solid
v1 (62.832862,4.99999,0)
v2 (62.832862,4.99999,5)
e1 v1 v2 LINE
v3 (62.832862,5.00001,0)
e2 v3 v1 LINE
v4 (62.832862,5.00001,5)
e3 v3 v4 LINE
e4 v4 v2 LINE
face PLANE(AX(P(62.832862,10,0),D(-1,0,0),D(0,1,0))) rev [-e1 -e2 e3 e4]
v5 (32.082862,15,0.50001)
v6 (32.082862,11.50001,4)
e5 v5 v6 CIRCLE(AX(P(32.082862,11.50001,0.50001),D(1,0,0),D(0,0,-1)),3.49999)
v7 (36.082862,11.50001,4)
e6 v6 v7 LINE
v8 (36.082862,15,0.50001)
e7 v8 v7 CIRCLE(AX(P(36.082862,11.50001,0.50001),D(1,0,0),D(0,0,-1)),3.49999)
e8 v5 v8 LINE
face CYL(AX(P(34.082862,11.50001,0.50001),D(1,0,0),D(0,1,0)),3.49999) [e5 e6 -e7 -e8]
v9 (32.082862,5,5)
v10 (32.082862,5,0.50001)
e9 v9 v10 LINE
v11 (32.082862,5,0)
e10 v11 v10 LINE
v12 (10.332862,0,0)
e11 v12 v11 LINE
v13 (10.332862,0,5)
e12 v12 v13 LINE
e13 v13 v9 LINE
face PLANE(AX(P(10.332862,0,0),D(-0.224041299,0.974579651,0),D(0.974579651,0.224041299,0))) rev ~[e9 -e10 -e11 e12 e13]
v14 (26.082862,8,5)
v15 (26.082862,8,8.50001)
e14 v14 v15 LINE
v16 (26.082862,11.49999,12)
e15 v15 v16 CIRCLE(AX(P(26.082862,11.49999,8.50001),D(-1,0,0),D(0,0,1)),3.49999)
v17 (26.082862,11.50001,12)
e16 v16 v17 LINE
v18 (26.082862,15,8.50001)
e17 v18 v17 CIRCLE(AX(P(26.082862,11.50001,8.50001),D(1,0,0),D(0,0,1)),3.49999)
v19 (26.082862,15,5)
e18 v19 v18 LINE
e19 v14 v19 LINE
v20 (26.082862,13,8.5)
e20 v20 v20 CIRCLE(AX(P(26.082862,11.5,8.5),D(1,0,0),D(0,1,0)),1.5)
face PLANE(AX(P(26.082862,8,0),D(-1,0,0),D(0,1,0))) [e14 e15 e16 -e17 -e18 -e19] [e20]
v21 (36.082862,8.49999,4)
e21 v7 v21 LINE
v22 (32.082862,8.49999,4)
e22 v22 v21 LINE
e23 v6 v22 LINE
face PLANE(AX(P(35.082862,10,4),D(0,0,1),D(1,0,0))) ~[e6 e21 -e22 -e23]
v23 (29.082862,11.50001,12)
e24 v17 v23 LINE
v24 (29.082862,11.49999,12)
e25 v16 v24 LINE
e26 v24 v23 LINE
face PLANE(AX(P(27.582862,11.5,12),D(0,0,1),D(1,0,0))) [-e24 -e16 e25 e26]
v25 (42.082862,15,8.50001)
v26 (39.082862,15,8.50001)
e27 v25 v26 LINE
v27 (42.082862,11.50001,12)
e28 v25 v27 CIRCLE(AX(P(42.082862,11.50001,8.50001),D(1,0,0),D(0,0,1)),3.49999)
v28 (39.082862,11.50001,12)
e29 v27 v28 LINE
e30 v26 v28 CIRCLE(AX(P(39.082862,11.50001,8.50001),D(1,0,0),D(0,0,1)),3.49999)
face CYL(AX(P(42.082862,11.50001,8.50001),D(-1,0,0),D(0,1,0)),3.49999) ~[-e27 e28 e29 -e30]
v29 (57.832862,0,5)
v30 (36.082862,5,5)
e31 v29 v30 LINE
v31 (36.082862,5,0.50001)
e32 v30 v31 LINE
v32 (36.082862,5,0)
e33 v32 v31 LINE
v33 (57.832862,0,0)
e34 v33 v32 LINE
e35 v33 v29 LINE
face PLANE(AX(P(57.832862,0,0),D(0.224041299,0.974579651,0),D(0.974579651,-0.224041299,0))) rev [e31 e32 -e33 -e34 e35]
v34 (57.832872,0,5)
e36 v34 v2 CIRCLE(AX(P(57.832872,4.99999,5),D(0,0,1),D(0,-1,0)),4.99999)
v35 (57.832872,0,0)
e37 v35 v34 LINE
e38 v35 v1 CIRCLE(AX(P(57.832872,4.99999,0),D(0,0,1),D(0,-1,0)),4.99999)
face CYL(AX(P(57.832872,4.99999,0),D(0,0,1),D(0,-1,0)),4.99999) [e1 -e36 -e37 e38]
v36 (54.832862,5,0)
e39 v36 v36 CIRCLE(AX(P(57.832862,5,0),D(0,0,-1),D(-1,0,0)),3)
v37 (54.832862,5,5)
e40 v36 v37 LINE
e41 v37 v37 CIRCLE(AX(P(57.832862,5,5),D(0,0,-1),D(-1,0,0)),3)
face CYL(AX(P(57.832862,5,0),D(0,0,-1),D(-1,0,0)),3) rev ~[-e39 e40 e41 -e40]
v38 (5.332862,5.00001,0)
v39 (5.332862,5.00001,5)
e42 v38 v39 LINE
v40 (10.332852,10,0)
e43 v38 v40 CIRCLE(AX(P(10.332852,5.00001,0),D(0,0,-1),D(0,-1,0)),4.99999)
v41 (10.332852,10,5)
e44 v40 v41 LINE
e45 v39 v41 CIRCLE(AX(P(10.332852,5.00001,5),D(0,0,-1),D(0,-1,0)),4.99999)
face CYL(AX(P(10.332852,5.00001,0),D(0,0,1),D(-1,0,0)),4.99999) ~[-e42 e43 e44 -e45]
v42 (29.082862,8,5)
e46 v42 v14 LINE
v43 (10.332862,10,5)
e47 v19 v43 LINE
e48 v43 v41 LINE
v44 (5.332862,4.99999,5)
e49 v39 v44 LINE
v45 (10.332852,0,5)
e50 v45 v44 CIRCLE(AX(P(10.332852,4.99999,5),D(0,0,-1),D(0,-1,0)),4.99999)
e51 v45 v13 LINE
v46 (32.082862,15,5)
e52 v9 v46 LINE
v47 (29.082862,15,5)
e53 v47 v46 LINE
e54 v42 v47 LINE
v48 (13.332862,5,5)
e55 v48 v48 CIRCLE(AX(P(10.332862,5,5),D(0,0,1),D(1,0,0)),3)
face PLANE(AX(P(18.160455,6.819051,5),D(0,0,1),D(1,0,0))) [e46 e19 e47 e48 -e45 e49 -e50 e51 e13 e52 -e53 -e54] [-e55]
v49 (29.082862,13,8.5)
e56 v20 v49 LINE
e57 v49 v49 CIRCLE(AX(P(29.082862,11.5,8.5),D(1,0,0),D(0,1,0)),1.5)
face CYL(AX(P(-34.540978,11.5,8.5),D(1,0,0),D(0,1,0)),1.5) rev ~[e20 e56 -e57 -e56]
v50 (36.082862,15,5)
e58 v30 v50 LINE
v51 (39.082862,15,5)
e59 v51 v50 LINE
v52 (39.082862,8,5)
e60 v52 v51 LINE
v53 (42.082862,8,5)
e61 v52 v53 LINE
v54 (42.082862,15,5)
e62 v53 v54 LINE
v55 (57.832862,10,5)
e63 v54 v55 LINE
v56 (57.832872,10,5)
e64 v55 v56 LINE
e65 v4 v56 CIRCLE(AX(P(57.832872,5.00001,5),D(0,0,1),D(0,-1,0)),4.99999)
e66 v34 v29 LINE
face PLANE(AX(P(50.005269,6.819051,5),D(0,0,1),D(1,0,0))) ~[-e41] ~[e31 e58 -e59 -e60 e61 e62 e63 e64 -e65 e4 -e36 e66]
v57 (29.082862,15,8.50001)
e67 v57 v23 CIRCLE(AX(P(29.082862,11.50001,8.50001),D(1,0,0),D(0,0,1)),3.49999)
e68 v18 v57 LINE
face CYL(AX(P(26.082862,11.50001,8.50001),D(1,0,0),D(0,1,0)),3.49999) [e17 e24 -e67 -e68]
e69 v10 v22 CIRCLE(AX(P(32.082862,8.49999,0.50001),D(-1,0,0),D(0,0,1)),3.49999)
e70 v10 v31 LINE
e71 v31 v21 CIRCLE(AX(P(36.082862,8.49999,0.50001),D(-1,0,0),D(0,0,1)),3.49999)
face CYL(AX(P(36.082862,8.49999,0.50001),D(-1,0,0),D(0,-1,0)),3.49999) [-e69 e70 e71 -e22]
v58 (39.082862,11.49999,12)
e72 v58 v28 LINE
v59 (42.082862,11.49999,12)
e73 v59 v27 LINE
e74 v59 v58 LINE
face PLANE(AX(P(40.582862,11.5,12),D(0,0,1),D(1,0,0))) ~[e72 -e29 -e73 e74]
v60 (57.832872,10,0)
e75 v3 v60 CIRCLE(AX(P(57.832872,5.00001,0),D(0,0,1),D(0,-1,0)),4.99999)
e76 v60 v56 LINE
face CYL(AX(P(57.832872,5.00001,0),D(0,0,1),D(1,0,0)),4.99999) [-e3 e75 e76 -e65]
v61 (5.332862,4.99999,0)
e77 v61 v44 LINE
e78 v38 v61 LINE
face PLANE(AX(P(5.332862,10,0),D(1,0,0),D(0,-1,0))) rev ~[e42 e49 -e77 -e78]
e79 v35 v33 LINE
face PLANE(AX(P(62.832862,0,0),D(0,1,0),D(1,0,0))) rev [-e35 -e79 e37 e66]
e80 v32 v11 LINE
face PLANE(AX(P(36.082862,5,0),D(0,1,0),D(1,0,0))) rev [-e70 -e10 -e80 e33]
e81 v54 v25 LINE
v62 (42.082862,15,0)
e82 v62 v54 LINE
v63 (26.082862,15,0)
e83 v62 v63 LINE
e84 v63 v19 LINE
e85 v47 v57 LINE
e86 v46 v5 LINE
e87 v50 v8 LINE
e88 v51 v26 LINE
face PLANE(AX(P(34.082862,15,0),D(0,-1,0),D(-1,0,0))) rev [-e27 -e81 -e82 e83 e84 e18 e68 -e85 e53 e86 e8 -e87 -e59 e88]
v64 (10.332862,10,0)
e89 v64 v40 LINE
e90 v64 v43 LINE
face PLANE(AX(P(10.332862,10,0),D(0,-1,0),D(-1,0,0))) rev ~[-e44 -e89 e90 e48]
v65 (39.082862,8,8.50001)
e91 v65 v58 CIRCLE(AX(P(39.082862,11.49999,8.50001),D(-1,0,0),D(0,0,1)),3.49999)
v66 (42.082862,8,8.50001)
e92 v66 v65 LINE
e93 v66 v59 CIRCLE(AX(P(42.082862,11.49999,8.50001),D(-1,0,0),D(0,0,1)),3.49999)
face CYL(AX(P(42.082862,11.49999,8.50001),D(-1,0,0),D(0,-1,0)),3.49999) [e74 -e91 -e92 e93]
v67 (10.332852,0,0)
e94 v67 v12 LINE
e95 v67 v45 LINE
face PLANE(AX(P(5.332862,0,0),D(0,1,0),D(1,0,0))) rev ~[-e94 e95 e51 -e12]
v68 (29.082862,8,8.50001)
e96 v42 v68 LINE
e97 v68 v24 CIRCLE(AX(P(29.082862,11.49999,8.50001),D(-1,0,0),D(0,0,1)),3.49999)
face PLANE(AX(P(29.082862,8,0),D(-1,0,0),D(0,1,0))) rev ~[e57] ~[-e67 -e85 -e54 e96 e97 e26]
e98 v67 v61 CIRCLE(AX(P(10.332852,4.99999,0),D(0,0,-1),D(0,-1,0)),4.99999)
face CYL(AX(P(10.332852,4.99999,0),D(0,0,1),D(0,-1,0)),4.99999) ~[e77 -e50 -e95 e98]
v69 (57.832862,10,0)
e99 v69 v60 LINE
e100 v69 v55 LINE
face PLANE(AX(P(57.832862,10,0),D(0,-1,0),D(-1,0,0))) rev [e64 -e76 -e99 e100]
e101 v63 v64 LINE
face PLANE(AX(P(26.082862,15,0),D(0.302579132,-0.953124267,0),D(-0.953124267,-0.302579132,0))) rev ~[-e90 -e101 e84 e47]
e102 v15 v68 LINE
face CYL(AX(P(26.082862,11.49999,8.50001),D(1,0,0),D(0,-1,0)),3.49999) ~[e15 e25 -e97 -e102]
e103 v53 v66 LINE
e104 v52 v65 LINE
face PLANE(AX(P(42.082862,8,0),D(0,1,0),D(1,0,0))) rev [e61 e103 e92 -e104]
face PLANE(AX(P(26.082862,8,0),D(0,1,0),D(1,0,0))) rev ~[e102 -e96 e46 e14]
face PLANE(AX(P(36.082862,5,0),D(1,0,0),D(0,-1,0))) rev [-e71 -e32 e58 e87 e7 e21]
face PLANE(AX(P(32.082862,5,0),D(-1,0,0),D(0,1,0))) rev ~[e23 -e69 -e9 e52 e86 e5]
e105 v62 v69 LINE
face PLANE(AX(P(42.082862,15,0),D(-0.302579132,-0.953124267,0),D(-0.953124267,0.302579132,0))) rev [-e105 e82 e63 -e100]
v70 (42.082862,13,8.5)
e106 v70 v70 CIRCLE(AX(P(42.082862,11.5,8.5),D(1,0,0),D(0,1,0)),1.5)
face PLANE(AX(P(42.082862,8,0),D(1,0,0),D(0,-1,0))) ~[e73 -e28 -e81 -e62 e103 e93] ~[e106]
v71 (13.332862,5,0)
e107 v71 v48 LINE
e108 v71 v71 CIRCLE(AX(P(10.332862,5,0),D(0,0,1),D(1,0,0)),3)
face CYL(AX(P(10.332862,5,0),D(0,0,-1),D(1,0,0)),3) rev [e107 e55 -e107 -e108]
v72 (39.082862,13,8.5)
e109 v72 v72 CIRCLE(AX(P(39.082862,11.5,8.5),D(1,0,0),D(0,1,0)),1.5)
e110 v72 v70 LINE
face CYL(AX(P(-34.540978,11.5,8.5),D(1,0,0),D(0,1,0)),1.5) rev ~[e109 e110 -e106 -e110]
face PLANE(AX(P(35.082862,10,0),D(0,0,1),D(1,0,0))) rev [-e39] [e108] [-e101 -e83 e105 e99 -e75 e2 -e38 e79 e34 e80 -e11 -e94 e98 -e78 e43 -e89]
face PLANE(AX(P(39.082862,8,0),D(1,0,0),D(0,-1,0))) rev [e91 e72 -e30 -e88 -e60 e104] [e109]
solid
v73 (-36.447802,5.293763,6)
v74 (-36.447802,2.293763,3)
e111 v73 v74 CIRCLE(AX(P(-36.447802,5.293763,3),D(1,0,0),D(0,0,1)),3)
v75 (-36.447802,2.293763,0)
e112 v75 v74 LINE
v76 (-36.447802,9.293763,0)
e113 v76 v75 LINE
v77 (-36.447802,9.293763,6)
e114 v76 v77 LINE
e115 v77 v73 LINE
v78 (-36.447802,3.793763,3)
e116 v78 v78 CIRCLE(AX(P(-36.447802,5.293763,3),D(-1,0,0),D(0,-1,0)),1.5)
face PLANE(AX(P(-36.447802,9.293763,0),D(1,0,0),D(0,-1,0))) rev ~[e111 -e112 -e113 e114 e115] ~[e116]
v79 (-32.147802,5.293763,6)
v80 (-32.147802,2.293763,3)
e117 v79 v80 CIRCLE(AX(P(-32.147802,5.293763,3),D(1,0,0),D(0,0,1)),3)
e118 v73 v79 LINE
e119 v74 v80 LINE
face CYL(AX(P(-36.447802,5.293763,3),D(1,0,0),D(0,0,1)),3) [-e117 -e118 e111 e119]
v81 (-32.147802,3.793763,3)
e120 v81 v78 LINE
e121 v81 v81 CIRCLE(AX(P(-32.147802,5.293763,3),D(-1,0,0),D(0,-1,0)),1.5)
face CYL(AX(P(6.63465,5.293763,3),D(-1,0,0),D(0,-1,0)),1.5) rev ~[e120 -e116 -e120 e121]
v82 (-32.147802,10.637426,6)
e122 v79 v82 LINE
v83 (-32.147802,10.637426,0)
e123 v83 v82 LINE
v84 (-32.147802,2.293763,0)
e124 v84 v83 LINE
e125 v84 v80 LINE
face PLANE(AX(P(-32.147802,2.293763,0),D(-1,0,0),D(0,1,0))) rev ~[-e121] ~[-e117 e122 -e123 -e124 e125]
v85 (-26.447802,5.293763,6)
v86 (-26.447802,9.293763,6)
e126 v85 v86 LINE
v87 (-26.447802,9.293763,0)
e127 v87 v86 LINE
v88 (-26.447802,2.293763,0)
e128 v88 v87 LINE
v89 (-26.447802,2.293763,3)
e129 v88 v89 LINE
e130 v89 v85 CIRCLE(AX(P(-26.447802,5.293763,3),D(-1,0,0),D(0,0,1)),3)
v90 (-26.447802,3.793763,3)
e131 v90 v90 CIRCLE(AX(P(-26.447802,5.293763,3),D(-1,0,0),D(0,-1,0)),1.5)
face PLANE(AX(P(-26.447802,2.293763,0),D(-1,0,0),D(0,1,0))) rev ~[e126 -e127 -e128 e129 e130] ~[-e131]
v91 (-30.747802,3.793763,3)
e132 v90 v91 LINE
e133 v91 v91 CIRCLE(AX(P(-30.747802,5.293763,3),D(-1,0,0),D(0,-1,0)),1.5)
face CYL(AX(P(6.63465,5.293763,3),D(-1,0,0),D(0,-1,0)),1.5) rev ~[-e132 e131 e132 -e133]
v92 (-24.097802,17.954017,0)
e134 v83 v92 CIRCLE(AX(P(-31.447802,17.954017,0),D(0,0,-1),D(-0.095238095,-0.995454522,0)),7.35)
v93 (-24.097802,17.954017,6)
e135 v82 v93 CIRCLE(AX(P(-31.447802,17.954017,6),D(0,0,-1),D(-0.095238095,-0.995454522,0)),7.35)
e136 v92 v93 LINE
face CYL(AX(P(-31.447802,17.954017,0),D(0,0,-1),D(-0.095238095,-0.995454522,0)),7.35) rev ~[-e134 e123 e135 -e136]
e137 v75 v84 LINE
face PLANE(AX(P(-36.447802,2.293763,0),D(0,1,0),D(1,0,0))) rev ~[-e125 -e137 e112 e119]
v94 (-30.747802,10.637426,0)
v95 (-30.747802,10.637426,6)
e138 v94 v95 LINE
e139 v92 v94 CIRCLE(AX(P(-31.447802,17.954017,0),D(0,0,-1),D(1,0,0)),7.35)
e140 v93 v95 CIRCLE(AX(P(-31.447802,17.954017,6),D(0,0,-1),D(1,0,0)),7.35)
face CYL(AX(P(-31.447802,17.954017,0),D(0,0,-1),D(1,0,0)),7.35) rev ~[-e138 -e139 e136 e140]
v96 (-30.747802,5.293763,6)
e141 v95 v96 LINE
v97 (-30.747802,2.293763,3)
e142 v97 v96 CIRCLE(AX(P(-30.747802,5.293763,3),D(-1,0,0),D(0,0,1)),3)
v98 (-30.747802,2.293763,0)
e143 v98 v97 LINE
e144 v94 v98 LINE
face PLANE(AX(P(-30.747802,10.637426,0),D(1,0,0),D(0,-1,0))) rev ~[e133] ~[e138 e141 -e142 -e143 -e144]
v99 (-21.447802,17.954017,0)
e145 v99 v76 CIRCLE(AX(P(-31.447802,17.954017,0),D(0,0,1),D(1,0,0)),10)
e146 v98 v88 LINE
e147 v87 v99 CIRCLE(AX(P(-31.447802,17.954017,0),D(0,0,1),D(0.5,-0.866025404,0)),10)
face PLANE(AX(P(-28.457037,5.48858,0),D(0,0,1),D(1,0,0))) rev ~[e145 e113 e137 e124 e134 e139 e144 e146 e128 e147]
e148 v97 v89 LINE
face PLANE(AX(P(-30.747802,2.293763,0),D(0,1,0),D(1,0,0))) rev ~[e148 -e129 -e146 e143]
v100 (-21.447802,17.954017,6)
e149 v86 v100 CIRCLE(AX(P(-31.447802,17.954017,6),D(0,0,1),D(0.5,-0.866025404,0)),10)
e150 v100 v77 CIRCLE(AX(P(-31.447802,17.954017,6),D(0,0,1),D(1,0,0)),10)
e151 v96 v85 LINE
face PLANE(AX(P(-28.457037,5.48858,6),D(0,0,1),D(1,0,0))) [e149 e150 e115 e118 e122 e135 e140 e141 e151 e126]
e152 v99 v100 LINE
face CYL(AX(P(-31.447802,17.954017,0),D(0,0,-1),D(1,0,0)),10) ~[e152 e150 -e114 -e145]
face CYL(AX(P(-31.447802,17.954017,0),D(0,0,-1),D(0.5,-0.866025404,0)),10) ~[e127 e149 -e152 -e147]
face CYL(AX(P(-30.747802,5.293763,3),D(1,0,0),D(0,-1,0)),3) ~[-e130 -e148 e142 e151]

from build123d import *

# Parameters (mm, degrees)
F1_DEPTH = 6
F3_D     = 3
F4_W     = 3
F4_H     = 7
F5_DEPTH = 12
F4_R     = 3
F6_DEPTH = 5
F7_DEPTH = 4
F8_R     = 4.99999
F9_R     = 3.49999
F12_D    = 3
F13_R    = 3


# Not quite as in the source:
# - a fillet or chamfer is up to 0.001 mm smaller than in the source, because OpenCascade refuses the exact size
# - a feature names something its author has since deleted; it is built from what else it names


with BuildPart() as f1:
    # F0 (on Top) → F1 (new body)
    with BuildSketch(Plane.XY):
        with BuildLine():
            ThreePointArc((-26.4478022211, 9.2937625569), (-28.5229179157, 8.3913259797), (-30.7478022211, 7.978546681))
            Line((-30.7478022211, 7.978546681), (-30.7478022211, 2.2937625569))
            Line((-30.7478022211, 2.2937625569), (-26.4478022211, 2.2937625569))
            Line((-26.4478022211, 2.2937625569), (-26.4478022211, 9.2937625569))
        make_face()
        with BuildLine():
            Line((-32.1478022211, 2.2937625569), (-32.1478022211, 7.978546681))
            ThreePointArc((-32.1478022211, 7.978546681), (-34.3726865265, 8.3913259797), (-36.4478022211, 9.2937625569))
            Line((-36.4478022211, 9.2937625569), (-36.4478022211, 2.2937625569))
            Line((-36.4478022211, 2.2937625569), (-32.1478022211, 2.2937625569))
        make_face()
        with BuildLine():
            ThreePointArc((-32.1478022211, 10.6374258586), (-36.3913586332, 23.3931111885), (-24.0978022211, 17.9540165948))
            ThreePointArc((-24.0978022211, 17.9540165948), (-26.0087076273, 13.0104601826), (-30.7478022211, 10.6374258586))
            Line((-30.7478022211, 10.6374258586), (-30.7478022211, 7.978546681))
            ThreePointArc((-30.7478022211, 7.978546681), (-28.5229179157, 8.3913259797), (-26.4478022211, 9.2937625569))
            ThreePointArc((-26.4478022211, 9.2937625569), (-22.7875481833, 12.9540165948), (-21.4478022211, 17.9540165948))
            ThreePointArc((-21.4478022211, 17.9540165948), (-36.4478022211, 26.6142706326), (-36.4478022211, 9.2937625569))
            ThreePointArc((-36.4478022211, 9.2937625569), (-34.3726865265, 8.3913259797), (-32.1478022211, 7.978546681))
            Line((-32.1478022211, 7.978546681), (-32.1478022211, 10.6374258586))
        make_face()
    extrude(amount=F1_DEPTH)

    # F3 (through all)
    with Locations(Plane.YZ.offset(-26.4478022211)):
        with Locations((5.2937625569, 3)):
            Hole(F3_D / 2)

    # F13
    f13_edges = [f1.edges().sort_by_distance(p)[0] for p in [
        (-34.297802, 2.293763, 6),
        (-28.597802, 2.293763, 6),
    ]]
    fillet(f13_edges, radius=F13_R)


with BuildPart() as f5:
    # F4 (on Top) → F5 (new body)
    with BuildSketch(Plane.XY):
        with Locations((27.5828619152, 11.5)):
            Rectangle(F4_W, F4_H)
    extrude(amount=F5_DEPTH)

    # F4 (on Top) → F6 (join)
    with BuildSketch(Plane.XY):
        Polygon((10.3328619152, 10), (5.3328619152, 10), (5.3328619152, 0), (10.3328619152, 0), (32.0828619152, 5), (32.0828619152, 8), (29.0828619152, 8), (26.0828619152, 8), (26.0828619152, 15), align=None)
        with Locations((10.3328619152, 5)):
            Circle(F4_R, mode=Mode.SUBTRACT)
        with Locations((30.5828619152, 11.5)):
            Rectangle(F4_W, F4_H)
    extrude(amount=F6_DEPTH)

    # F4 (on Top) → F7 (join)
    with BuildSketch(Plane.XY):
        Polygon((32.0828619152, 8), (32.0828619152, 5), (34.0828619152, 5), (34.0828619152, 15), (32.0828619152, 15), align=None)
    extrude(amount=F7_DEPTH)

    # F8 (radius 5 in the source; OpenCascade refuses exactly that, so slightly less here)
    f8_edges = [f5.edges().sort_by_distance(p)[0] for p in [
        (5.332862, 0, 2.5),
        (5.332862, 10, 2.5),
    ]]
    fillet(f8_edges, radius=F8_R)

    # F9 (radius 3.5 in the source; OpenCascade refuses exactly that, so slightly less here)
    f9_edges = [f5.edges().sort_by_distance(p)[0] for p in [
        (33.082862, 15, 4),
        (33.082862, 5, 4),
        (27.582862, 15, 12),
        (27.582862, 8, 12),
    ]]
    fillet(f9_edges, radius=F9_R)

    # F11: F5 across face


with BuildPart() as f5_1:
    add(f5.part)
    add(f5.part.mirror(Plane(origin=(34.0828619152, 10, 1.8156418236), x_dir=(0, 1, 0), z_dir=(1, 0, 0))))

    # F12 (through all)
    with Locations(Plane(origin=(26.0828619152, 0, 0), x_dir=(0, -1, 0), z_dir=(-1, 0, 0))):
        with Locations((-11.5, 8.5)):
            Hole(F12_D / 2)


solid = Compound([f1.part, f5_1.part])
